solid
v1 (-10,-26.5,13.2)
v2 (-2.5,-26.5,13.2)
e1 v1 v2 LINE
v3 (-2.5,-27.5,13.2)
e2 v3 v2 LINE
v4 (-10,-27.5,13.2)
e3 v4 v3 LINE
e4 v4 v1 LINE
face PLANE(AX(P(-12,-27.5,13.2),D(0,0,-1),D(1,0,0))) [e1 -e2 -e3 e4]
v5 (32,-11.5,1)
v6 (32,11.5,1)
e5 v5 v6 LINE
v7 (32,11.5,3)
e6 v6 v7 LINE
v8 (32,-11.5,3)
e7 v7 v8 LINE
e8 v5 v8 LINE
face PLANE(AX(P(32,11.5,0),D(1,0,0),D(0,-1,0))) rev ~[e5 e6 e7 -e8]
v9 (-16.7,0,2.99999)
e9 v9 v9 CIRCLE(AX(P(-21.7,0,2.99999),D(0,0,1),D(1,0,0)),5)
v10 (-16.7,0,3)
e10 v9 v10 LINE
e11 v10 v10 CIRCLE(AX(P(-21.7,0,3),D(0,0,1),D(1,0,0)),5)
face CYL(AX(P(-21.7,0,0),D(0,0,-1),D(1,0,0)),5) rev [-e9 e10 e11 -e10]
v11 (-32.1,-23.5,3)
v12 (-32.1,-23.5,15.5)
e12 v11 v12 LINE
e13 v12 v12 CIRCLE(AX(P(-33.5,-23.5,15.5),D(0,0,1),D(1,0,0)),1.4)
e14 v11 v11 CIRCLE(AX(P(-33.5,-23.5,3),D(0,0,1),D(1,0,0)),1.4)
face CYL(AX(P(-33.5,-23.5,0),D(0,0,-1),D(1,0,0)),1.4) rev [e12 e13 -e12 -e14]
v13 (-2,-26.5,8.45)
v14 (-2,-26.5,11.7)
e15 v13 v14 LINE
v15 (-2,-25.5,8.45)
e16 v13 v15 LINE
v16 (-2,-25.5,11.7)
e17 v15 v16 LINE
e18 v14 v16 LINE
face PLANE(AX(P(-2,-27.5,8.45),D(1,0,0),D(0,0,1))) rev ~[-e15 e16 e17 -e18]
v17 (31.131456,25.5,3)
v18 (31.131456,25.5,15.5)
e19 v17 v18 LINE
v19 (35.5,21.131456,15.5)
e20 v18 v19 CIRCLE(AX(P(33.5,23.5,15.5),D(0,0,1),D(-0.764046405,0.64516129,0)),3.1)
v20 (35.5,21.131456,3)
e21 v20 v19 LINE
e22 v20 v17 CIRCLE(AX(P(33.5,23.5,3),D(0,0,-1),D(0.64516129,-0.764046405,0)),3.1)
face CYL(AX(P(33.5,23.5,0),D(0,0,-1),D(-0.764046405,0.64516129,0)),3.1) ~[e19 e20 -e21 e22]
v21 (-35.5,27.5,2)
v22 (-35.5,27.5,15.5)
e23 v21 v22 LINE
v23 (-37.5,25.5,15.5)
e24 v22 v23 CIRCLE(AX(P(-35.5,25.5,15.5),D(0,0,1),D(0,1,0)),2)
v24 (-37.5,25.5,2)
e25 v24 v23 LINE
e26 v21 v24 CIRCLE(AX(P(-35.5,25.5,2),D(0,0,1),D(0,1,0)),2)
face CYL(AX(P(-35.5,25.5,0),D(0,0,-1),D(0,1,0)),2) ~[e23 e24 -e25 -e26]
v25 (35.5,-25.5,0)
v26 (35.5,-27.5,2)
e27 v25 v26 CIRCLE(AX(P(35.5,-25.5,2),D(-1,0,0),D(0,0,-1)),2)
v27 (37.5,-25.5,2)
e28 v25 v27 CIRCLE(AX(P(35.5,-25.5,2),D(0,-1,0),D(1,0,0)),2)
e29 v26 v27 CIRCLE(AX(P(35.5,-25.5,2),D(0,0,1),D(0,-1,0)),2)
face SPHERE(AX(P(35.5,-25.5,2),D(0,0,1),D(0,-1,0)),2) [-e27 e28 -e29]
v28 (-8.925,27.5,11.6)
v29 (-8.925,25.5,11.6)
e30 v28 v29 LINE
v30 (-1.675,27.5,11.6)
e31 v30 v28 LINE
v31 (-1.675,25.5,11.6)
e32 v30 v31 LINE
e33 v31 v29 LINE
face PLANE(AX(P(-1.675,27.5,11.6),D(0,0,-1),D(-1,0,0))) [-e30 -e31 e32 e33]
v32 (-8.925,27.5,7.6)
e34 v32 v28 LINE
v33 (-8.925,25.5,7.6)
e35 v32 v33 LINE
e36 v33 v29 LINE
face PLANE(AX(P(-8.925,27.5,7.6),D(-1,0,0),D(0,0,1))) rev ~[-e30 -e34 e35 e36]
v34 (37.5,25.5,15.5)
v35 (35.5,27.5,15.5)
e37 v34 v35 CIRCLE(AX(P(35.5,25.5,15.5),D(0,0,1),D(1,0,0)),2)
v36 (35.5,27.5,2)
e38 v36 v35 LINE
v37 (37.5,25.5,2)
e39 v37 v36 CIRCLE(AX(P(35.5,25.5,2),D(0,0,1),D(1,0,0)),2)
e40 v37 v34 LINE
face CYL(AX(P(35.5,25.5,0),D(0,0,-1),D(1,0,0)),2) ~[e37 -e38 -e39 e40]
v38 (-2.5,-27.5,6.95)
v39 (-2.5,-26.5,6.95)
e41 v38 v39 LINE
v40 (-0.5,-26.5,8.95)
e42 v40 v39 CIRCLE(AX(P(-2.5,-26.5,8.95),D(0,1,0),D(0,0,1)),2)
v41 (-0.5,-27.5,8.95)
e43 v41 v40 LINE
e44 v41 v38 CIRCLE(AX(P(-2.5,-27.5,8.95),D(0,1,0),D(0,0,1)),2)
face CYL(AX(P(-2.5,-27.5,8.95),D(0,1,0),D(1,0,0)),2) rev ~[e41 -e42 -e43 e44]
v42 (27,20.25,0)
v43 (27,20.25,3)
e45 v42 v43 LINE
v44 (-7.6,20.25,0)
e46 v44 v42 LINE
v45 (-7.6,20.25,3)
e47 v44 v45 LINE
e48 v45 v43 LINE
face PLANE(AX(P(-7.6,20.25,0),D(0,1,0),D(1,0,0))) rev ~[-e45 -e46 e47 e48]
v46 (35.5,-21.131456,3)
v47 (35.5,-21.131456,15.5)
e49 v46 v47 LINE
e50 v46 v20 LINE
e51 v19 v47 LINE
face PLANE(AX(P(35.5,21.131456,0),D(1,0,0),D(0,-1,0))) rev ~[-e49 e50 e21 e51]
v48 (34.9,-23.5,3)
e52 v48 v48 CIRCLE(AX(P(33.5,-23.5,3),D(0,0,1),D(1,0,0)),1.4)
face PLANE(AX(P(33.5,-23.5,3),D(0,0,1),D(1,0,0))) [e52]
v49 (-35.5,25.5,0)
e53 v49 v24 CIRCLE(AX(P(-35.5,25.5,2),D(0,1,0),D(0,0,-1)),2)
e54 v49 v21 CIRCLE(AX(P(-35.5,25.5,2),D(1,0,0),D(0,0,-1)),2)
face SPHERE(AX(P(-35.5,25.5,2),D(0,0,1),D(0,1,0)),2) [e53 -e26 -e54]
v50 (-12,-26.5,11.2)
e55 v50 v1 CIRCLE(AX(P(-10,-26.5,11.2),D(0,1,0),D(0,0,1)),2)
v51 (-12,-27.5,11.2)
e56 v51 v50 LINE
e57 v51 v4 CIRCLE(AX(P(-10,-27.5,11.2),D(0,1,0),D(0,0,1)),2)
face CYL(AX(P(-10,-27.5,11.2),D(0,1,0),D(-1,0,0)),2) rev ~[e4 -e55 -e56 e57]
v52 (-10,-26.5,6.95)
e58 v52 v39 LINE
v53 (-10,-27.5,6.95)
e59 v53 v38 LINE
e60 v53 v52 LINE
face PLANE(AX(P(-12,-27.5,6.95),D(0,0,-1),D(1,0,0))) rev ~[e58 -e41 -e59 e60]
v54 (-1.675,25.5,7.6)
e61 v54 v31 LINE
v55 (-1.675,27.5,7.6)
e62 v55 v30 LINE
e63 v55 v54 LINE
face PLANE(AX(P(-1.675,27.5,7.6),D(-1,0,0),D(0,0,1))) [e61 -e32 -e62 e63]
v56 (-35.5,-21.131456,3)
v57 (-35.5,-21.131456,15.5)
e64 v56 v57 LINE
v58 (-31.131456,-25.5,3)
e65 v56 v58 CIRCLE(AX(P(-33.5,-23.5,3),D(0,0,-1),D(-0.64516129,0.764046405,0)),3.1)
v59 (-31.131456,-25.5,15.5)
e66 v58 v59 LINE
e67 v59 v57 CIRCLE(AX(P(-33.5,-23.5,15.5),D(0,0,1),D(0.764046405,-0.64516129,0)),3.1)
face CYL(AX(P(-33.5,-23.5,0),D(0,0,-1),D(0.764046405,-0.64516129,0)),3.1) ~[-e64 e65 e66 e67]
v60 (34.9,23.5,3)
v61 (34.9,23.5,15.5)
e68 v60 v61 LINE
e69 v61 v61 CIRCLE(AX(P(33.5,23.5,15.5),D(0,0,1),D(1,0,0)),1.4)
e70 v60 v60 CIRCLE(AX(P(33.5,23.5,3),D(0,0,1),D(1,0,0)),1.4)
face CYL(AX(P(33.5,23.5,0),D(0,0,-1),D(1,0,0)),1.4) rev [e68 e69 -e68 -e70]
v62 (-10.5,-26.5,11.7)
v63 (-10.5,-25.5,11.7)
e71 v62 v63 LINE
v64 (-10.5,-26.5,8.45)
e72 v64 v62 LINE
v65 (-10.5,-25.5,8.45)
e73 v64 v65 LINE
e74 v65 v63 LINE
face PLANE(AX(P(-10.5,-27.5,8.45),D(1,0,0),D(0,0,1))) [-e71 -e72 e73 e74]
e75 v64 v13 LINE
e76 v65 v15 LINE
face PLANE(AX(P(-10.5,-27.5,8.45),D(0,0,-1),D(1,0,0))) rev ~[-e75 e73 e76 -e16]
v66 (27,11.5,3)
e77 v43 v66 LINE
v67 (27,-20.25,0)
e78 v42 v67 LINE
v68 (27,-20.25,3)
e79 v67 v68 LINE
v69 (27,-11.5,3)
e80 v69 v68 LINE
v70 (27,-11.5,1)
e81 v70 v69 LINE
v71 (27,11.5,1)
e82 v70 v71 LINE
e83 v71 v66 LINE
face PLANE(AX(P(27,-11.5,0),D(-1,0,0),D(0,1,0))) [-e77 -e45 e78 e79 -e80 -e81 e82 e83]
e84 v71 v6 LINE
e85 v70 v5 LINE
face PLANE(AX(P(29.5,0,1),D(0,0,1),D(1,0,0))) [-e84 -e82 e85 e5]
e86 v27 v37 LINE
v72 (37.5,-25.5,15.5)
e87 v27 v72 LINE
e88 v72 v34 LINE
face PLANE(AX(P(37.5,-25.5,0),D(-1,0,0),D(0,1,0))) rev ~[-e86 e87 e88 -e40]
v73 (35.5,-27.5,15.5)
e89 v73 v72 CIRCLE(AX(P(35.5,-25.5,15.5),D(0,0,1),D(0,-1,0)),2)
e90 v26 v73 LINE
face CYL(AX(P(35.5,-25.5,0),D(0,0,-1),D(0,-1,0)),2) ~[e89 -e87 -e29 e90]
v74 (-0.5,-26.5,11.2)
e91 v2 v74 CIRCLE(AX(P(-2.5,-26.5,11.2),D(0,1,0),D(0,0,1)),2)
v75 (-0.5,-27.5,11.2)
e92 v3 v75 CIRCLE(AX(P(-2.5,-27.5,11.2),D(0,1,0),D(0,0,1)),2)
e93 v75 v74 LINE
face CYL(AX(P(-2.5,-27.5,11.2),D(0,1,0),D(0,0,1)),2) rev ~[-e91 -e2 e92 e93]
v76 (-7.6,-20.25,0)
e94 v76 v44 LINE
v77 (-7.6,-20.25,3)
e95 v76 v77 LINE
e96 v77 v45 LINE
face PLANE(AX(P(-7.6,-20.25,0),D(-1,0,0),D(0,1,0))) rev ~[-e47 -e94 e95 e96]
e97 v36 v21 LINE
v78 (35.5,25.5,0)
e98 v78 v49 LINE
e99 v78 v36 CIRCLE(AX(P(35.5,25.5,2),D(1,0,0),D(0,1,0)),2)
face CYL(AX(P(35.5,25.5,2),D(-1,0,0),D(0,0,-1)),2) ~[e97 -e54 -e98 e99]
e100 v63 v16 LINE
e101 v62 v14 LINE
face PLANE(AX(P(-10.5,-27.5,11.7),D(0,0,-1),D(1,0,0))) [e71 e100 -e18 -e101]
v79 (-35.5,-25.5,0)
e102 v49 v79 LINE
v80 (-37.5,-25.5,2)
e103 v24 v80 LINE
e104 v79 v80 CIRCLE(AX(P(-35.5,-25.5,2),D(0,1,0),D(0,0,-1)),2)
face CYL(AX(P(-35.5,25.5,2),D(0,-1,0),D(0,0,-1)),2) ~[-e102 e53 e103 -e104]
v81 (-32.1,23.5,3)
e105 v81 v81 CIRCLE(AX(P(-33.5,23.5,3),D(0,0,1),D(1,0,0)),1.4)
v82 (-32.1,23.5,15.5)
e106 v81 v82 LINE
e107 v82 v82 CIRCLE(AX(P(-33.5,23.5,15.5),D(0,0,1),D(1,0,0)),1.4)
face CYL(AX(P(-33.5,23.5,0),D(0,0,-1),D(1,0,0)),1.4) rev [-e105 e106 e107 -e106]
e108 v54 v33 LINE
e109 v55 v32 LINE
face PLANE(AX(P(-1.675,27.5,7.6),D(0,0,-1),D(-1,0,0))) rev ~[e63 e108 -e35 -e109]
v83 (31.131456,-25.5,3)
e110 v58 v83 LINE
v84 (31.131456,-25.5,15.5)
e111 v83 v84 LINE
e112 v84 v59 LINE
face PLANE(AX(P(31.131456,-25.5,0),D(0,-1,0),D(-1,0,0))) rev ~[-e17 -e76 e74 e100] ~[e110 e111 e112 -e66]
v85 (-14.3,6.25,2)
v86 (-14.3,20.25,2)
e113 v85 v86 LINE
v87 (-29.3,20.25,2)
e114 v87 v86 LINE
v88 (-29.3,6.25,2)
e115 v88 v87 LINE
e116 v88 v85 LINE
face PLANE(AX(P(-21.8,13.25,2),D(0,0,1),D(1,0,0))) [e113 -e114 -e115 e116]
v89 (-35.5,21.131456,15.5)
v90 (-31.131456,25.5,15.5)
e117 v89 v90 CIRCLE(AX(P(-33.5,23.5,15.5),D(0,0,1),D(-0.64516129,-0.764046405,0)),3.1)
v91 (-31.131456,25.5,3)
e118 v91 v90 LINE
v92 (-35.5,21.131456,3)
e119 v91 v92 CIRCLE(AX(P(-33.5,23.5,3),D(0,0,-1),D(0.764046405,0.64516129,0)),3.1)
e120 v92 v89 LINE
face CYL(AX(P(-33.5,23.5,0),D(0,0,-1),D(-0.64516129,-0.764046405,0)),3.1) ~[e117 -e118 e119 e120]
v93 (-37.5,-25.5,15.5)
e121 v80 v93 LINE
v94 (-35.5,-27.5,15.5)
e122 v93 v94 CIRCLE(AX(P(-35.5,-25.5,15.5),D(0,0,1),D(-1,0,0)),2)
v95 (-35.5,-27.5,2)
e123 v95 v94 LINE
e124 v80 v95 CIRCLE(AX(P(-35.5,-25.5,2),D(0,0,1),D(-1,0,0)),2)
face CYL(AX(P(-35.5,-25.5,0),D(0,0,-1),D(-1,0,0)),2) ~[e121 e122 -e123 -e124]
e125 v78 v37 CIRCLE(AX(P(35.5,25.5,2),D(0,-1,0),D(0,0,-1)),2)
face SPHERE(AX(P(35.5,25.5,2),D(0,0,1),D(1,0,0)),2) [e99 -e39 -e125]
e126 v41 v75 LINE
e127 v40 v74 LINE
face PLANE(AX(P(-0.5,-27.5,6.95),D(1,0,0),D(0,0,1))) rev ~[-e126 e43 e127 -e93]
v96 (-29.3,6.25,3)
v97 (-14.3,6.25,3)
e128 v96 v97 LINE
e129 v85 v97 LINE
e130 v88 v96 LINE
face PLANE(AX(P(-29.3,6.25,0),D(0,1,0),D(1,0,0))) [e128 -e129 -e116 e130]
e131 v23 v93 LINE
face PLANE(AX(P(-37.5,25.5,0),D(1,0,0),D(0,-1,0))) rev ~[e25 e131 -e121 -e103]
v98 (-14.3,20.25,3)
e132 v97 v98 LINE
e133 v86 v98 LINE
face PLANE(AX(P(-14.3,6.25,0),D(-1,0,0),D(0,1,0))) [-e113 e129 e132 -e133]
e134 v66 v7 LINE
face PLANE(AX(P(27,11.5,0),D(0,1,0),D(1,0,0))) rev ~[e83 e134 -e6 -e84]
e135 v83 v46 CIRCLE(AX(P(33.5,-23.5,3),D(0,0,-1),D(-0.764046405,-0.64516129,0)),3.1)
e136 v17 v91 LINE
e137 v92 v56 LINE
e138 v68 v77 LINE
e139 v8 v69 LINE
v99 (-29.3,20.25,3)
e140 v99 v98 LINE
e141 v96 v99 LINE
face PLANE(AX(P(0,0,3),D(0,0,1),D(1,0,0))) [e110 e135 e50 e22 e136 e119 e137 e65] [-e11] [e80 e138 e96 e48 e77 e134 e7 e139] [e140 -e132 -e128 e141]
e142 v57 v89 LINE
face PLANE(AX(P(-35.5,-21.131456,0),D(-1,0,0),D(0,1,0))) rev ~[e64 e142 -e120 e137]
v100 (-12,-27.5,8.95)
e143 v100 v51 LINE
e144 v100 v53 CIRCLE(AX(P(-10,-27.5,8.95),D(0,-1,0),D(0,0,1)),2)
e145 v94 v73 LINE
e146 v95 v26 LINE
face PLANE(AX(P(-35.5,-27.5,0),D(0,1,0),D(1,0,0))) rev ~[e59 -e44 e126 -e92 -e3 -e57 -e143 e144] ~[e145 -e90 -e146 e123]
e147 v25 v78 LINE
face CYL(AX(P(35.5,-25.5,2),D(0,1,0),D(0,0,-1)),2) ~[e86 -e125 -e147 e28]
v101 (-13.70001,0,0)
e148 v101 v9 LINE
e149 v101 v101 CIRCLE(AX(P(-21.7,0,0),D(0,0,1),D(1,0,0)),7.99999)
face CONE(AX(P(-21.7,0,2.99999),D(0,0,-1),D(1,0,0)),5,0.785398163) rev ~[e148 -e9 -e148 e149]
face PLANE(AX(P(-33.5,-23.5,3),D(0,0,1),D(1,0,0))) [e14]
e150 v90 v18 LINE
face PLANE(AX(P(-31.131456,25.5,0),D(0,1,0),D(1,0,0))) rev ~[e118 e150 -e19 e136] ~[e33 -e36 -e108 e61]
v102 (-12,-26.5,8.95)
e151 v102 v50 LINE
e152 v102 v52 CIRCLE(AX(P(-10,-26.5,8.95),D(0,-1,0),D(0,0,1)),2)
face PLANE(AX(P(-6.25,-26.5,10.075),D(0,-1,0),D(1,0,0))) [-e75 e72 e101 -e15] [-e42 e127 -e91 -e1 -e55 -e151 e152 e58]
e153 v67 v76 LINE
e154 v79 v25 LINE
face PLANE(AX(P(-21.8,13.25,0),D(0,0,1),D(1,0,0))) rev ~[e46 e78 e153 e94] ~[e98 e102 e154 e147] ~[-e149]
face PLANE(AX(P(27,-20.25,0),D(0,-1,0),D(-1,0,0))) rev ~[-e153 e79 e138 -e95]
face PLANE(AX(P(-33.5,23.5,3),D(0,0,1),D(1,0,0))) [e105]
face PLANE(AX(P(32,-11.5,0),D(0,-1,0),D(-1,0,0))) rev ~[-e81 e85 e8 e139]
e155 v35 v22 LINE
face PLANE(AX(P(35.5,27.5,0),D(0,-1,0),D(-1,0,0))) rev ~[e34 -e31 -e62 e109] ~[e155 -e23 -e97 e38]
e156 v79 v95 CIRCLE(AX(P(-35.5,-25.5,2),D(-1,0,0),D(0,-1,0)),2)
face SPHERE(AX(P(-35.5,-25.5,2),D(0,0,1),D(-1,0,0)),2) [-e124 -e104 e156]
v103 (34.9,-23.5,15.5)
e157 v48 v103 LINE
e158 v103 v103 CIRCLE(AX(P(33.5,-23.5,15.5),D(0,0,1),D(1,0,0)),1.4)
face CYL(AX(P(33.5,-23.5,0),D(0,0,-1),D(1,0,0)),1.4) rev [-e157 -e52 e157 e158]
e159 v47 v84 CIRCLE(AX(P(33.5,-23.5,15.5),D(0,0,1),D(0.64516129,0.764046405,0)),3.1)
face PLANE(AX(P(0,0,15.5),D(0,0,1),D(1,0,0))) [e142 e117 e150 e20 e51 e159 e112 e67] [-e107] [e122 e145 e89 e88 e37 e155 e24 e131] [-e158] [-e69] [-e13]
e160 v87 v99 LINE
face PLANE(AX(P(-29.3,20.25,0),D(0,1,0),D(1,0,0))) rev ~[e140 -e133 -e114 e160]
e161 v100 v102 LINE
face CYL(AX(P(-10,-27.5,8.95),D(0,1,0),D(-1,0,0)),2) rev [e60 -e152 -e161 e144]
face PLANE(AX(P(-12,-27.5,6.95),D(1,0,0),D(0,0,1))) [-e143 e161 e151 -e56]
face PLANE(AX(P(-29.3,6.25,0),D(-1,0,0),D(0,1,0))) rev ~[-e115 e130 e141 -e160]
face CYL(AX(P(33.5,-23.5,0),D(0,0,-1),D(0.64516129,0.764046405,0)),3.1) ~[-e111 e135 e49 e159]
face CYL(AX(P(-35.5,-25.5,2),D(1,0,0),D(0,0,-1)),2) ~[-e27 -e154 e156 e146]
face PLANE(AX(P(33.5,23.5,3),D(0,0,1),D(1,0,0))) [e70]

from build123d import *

# Parameters (mm, degrees)
F0_R      = 5
F0_W      = 15
F0_H      = 14
F1_DEPTH  = 3
F0_W_2    = 5
F0_H_2    = 23
F2_DEPTH  = 1
F0_R_2    = 1.4
F3_DEPTH  = 15.5
F4_DEPTH  = 3
F5_R      = 2
F6_W      = 7.25
F6_H      = 4
F7_DEPTH  = 25
F8_W      = 8.5
F8_H      = 3.25
F9_DEPTH  = 25
F8_W_2    = 11.5
F8_H_2    = 6.25
F10_DEPTH = 1
F11_R     = 2
F12_DEPTH = 2
F13_SIZE  = 2.99999


# Not quite as in the source:
# - a fillet or chamfer is up to 0.001 mm smaller than in the source, because OpenCascade refuses the exact size
# - a feature names something its author has since deleted; it is built from what else it names


with BuildPart() as f1:
    # F0 (on Top) → F1 (new body)
    with BuildSketch(Plane.XY):
        with BuildLine():
            ThreePointArc((35.5, 21.1314561435), (31.3079689783, 21.3079689783), (31.1314561435, 25.5))
            Line((31.1314561435, 25.5), (-31.1314561435, 25.5))
            ThreePointArc((-31.1314561435, 25.5), (-31.3079689783, 21.3079689783), (-35.5, 21.1314561435))
            Line((-35.5, 21.1314561435), (-35.5, -21.1314561435))
            ThreePointArc((-35.5, -21.1314561435), (-31.3079689783, -21.3079689783), (-31.1314561435, -25.5))
            Line((-31.1314561435, -25.5), (31.1314561435, -25.5))
            ThreePointArc((31.1314561435, -25.5), (31.3079689783, -21.3079689783), (35.5, -21.1314561435))
            Line((35.5, -21.1314561435), (35.5, 21.1314561435))
        make_face()
        with Locations((-21.7, 0)):
            Circle(F0_R, mode=Mode.SUBTRACT)
        with Locations((-21.8, 13.25)):
            Rectangle(F0_W, F0_H, mode=Mode.SUBTRACT)
        Polygon((-7.6, -20.25), (-7.6, 20.25), (27, 20.25), (27, 11.5), (32, 11.5), (32, -11.5), (27, -11.5), (27, -20.25), align=None, mode=Mode.SUBTRACT)
    extrude(amount=F1_DEPTH)

    # F0 (on Top) → F2 (join)
    with BuildSketch(Plane.XY):
        with Locations((29.5, 0)):
            Rectangle(F0_W_2, F0_H_2)
    extrude(amount=F2_DEPTH)

    # F0 (on Top) → F3 (join)
    with BuildSketch(Plane.XY):
        with BuildLine():
            ThreePointArc((37.5, 25.5), (36.9142135624, 26.9142135624), (35.5, 27.5))
            Line((35.5, 27.5), (-35.5, 27.5))
            ThreePointArc((-35.5, 27.5), (-36.9142135624, 26.9142135624), (-37.5, 25.5))
            Line((-37.5, 25.5), (-37.5, -25.5))
            ThreePointArc((-37.5, -25.5), (-36.9142135624, -26.9142135624), (-35.5, -27.5))
            Line((-35.5, -27.5), (35.5, -27.5))
            ThreePointArc((35.5, -27.5), (36.9142135624, -26.9142135624), (37.5, -25.5))
            Line((37.5, -25.5), (37.5, 25.5))
        make_face()
        Polygon((31.1314561435, 25.5), (35.5, 25.5), (35.5, 21.1314561435), (35.5, -21.1314561435), (35.5, -25.5), (31.1314561435, -25.5), (-31.1314561435, -25.5), (-35.5, -25.5), (-35.5, -21.1314561435), (-35.5, 21.1314561435), (-35.5, 25.5), (-31.1314561435, 25.5), align=None, mode=Mode.SUBTRACT)
        with BuildLine():
            ThreePointArc((-35.5, 21.1314561435), (-31.3079689783, 21.3079689783), (-31.1314561435, 25.5))
            Line((-31.1314561435, 25.5), (-35.5, 25.5))
            Line((-35.5, 25.5), (-35.5, 21.1314561435))
        make_face()
        with Locations((-33.5, 23.5)):
            Circle(F0_R_2, mode=Mode.SUBTRACT)
        with BuildLine():
            ThreePointArc((-31.1314561435, -25.5), (-31.3079689783, -21.3079689783), (-35.5, -21.1314561435))
            Line((-35.5, -21.1314561435), (-35.5, -25.5))
            Line((-35.5, -25.5), (-31.1314561435, -25.5))
        make_face()
        with Locations((-33.5, -23.5)):
            Circle(F0_R_2, mode=Mode.SUBTRACT)
        with BuildLine():
            Line((35.5, -25.5), (35.5, -21.1314561435))
            ThreePointArc((35.5, -21.1314561435), (31.3079689783, -21.3079689783), (31.1314561435, -25.5))
            Line((31.1314561435, -25.5), (35.5, -25.5))
        make_face()
        with Locations((33.5, -23.5)):
            Circle(F0_R_2, mode=Mode.SUBTRACT)
        with BuildLine():
            Line((35.5, 21.1314561435), (35.5, 25.5))
            Line((35.5, 25.5), (31.1314561435, 25.5))
            ThreePointArc((31.1314561435, 25.5), (31.3079689783, 21.3079689783), (35.5, 21.1314561435))
        make_face()
        with Locations((33.5, 23.5)):
            Circle(F0_R_2, mode=Mode.SUBTRACT)
    extrude(amount=F3_DEPTH)

    # F0 (on Top) → F4 (join)
    with BuildSketch(Plane.XY):
        with Locations((33.5, -23.5)):
            Circle(F0_R_2)
        with Locations((33.5, 23.5)):
            Circle(F0_R_2)
        with Locations((-33.5, 23.5)):
            Circle(F0_R_2)
        with Locations((-33.5, -23.5)):
            Circle(F0_R_2)
    extrude(amount=F4_DEPTH)

    # F5
    f5_edges = [f1.edges().sort_by_distance(p)[0] for p in [
        (-37.5, 0, 0),
    ]]
    fillet(f5_edges, radius=F5_R)

    # F6 (on face) → F7 (cut)
    with BuildSketch(Plane(origin=(0, 27.5, 0), x_dir=(-1, 0, 0), z_dir=(0, 1, 0))):
        with Locations((5.3, 9.6)):
            Rectangle(F6_W, F6_H)
    extrude(amount=-F7_DEPTH, mode=Mode.SUBTRACT)

    # F8 (on face) → F9 (cut)
    with BuildSketch(Plane.XZ.offset(27.5)):
        with Locations((-6.25, 10.075)):
            Rectangle(F8_W, F8_H)
    extrude(amount=-F9_DEPTH, mode=Mode.SUBTRACT)

    # F8 (on face) → F10 (cut)
    with BuildSketch(Plane.XZ.offset(27.5)):
        with Locations((-6.25, 10.075)):
            Rectangle(F8_W_2, F8_H_2)
        with Locations((-6.25, 10.075)):
            Rectangle(F8_W, F8_H, mode=Mode.SUBTRACT)
    extrude(amount=-F10_DEPTH, mode=Mode.SUBTRACT)

    # F11
    f11_edges = [f1.edges().sort_by_distance(p)[0] for p in [
        (-0.5, -27, 13.2),
        (-0.5, -27, 6.95),
        (-12, -27, 6.95),
        (-12, -27, 13.2),
    ]]
    fillet(f11_edges, radius=F11_R)

    # F0 (on Top) → F12 (join)
    with BuildSketch(Plane.XY):
        with Locations((-21.8, 13.25)):
            Rectangle(F0_W, F0_H)
    extrude(amount=F12_DEPTH)

    # F13 (size 3 in the source; OpenCascade refuses exactly that, so slightly less here)
    f13_edges = [f1.edges().sort_by_distance(p)[0] for p in [
        (-26.7, 0, 0),
    ]]
    chamfer(f13_edges, length=F13_SIZE)


solid = f1.part
